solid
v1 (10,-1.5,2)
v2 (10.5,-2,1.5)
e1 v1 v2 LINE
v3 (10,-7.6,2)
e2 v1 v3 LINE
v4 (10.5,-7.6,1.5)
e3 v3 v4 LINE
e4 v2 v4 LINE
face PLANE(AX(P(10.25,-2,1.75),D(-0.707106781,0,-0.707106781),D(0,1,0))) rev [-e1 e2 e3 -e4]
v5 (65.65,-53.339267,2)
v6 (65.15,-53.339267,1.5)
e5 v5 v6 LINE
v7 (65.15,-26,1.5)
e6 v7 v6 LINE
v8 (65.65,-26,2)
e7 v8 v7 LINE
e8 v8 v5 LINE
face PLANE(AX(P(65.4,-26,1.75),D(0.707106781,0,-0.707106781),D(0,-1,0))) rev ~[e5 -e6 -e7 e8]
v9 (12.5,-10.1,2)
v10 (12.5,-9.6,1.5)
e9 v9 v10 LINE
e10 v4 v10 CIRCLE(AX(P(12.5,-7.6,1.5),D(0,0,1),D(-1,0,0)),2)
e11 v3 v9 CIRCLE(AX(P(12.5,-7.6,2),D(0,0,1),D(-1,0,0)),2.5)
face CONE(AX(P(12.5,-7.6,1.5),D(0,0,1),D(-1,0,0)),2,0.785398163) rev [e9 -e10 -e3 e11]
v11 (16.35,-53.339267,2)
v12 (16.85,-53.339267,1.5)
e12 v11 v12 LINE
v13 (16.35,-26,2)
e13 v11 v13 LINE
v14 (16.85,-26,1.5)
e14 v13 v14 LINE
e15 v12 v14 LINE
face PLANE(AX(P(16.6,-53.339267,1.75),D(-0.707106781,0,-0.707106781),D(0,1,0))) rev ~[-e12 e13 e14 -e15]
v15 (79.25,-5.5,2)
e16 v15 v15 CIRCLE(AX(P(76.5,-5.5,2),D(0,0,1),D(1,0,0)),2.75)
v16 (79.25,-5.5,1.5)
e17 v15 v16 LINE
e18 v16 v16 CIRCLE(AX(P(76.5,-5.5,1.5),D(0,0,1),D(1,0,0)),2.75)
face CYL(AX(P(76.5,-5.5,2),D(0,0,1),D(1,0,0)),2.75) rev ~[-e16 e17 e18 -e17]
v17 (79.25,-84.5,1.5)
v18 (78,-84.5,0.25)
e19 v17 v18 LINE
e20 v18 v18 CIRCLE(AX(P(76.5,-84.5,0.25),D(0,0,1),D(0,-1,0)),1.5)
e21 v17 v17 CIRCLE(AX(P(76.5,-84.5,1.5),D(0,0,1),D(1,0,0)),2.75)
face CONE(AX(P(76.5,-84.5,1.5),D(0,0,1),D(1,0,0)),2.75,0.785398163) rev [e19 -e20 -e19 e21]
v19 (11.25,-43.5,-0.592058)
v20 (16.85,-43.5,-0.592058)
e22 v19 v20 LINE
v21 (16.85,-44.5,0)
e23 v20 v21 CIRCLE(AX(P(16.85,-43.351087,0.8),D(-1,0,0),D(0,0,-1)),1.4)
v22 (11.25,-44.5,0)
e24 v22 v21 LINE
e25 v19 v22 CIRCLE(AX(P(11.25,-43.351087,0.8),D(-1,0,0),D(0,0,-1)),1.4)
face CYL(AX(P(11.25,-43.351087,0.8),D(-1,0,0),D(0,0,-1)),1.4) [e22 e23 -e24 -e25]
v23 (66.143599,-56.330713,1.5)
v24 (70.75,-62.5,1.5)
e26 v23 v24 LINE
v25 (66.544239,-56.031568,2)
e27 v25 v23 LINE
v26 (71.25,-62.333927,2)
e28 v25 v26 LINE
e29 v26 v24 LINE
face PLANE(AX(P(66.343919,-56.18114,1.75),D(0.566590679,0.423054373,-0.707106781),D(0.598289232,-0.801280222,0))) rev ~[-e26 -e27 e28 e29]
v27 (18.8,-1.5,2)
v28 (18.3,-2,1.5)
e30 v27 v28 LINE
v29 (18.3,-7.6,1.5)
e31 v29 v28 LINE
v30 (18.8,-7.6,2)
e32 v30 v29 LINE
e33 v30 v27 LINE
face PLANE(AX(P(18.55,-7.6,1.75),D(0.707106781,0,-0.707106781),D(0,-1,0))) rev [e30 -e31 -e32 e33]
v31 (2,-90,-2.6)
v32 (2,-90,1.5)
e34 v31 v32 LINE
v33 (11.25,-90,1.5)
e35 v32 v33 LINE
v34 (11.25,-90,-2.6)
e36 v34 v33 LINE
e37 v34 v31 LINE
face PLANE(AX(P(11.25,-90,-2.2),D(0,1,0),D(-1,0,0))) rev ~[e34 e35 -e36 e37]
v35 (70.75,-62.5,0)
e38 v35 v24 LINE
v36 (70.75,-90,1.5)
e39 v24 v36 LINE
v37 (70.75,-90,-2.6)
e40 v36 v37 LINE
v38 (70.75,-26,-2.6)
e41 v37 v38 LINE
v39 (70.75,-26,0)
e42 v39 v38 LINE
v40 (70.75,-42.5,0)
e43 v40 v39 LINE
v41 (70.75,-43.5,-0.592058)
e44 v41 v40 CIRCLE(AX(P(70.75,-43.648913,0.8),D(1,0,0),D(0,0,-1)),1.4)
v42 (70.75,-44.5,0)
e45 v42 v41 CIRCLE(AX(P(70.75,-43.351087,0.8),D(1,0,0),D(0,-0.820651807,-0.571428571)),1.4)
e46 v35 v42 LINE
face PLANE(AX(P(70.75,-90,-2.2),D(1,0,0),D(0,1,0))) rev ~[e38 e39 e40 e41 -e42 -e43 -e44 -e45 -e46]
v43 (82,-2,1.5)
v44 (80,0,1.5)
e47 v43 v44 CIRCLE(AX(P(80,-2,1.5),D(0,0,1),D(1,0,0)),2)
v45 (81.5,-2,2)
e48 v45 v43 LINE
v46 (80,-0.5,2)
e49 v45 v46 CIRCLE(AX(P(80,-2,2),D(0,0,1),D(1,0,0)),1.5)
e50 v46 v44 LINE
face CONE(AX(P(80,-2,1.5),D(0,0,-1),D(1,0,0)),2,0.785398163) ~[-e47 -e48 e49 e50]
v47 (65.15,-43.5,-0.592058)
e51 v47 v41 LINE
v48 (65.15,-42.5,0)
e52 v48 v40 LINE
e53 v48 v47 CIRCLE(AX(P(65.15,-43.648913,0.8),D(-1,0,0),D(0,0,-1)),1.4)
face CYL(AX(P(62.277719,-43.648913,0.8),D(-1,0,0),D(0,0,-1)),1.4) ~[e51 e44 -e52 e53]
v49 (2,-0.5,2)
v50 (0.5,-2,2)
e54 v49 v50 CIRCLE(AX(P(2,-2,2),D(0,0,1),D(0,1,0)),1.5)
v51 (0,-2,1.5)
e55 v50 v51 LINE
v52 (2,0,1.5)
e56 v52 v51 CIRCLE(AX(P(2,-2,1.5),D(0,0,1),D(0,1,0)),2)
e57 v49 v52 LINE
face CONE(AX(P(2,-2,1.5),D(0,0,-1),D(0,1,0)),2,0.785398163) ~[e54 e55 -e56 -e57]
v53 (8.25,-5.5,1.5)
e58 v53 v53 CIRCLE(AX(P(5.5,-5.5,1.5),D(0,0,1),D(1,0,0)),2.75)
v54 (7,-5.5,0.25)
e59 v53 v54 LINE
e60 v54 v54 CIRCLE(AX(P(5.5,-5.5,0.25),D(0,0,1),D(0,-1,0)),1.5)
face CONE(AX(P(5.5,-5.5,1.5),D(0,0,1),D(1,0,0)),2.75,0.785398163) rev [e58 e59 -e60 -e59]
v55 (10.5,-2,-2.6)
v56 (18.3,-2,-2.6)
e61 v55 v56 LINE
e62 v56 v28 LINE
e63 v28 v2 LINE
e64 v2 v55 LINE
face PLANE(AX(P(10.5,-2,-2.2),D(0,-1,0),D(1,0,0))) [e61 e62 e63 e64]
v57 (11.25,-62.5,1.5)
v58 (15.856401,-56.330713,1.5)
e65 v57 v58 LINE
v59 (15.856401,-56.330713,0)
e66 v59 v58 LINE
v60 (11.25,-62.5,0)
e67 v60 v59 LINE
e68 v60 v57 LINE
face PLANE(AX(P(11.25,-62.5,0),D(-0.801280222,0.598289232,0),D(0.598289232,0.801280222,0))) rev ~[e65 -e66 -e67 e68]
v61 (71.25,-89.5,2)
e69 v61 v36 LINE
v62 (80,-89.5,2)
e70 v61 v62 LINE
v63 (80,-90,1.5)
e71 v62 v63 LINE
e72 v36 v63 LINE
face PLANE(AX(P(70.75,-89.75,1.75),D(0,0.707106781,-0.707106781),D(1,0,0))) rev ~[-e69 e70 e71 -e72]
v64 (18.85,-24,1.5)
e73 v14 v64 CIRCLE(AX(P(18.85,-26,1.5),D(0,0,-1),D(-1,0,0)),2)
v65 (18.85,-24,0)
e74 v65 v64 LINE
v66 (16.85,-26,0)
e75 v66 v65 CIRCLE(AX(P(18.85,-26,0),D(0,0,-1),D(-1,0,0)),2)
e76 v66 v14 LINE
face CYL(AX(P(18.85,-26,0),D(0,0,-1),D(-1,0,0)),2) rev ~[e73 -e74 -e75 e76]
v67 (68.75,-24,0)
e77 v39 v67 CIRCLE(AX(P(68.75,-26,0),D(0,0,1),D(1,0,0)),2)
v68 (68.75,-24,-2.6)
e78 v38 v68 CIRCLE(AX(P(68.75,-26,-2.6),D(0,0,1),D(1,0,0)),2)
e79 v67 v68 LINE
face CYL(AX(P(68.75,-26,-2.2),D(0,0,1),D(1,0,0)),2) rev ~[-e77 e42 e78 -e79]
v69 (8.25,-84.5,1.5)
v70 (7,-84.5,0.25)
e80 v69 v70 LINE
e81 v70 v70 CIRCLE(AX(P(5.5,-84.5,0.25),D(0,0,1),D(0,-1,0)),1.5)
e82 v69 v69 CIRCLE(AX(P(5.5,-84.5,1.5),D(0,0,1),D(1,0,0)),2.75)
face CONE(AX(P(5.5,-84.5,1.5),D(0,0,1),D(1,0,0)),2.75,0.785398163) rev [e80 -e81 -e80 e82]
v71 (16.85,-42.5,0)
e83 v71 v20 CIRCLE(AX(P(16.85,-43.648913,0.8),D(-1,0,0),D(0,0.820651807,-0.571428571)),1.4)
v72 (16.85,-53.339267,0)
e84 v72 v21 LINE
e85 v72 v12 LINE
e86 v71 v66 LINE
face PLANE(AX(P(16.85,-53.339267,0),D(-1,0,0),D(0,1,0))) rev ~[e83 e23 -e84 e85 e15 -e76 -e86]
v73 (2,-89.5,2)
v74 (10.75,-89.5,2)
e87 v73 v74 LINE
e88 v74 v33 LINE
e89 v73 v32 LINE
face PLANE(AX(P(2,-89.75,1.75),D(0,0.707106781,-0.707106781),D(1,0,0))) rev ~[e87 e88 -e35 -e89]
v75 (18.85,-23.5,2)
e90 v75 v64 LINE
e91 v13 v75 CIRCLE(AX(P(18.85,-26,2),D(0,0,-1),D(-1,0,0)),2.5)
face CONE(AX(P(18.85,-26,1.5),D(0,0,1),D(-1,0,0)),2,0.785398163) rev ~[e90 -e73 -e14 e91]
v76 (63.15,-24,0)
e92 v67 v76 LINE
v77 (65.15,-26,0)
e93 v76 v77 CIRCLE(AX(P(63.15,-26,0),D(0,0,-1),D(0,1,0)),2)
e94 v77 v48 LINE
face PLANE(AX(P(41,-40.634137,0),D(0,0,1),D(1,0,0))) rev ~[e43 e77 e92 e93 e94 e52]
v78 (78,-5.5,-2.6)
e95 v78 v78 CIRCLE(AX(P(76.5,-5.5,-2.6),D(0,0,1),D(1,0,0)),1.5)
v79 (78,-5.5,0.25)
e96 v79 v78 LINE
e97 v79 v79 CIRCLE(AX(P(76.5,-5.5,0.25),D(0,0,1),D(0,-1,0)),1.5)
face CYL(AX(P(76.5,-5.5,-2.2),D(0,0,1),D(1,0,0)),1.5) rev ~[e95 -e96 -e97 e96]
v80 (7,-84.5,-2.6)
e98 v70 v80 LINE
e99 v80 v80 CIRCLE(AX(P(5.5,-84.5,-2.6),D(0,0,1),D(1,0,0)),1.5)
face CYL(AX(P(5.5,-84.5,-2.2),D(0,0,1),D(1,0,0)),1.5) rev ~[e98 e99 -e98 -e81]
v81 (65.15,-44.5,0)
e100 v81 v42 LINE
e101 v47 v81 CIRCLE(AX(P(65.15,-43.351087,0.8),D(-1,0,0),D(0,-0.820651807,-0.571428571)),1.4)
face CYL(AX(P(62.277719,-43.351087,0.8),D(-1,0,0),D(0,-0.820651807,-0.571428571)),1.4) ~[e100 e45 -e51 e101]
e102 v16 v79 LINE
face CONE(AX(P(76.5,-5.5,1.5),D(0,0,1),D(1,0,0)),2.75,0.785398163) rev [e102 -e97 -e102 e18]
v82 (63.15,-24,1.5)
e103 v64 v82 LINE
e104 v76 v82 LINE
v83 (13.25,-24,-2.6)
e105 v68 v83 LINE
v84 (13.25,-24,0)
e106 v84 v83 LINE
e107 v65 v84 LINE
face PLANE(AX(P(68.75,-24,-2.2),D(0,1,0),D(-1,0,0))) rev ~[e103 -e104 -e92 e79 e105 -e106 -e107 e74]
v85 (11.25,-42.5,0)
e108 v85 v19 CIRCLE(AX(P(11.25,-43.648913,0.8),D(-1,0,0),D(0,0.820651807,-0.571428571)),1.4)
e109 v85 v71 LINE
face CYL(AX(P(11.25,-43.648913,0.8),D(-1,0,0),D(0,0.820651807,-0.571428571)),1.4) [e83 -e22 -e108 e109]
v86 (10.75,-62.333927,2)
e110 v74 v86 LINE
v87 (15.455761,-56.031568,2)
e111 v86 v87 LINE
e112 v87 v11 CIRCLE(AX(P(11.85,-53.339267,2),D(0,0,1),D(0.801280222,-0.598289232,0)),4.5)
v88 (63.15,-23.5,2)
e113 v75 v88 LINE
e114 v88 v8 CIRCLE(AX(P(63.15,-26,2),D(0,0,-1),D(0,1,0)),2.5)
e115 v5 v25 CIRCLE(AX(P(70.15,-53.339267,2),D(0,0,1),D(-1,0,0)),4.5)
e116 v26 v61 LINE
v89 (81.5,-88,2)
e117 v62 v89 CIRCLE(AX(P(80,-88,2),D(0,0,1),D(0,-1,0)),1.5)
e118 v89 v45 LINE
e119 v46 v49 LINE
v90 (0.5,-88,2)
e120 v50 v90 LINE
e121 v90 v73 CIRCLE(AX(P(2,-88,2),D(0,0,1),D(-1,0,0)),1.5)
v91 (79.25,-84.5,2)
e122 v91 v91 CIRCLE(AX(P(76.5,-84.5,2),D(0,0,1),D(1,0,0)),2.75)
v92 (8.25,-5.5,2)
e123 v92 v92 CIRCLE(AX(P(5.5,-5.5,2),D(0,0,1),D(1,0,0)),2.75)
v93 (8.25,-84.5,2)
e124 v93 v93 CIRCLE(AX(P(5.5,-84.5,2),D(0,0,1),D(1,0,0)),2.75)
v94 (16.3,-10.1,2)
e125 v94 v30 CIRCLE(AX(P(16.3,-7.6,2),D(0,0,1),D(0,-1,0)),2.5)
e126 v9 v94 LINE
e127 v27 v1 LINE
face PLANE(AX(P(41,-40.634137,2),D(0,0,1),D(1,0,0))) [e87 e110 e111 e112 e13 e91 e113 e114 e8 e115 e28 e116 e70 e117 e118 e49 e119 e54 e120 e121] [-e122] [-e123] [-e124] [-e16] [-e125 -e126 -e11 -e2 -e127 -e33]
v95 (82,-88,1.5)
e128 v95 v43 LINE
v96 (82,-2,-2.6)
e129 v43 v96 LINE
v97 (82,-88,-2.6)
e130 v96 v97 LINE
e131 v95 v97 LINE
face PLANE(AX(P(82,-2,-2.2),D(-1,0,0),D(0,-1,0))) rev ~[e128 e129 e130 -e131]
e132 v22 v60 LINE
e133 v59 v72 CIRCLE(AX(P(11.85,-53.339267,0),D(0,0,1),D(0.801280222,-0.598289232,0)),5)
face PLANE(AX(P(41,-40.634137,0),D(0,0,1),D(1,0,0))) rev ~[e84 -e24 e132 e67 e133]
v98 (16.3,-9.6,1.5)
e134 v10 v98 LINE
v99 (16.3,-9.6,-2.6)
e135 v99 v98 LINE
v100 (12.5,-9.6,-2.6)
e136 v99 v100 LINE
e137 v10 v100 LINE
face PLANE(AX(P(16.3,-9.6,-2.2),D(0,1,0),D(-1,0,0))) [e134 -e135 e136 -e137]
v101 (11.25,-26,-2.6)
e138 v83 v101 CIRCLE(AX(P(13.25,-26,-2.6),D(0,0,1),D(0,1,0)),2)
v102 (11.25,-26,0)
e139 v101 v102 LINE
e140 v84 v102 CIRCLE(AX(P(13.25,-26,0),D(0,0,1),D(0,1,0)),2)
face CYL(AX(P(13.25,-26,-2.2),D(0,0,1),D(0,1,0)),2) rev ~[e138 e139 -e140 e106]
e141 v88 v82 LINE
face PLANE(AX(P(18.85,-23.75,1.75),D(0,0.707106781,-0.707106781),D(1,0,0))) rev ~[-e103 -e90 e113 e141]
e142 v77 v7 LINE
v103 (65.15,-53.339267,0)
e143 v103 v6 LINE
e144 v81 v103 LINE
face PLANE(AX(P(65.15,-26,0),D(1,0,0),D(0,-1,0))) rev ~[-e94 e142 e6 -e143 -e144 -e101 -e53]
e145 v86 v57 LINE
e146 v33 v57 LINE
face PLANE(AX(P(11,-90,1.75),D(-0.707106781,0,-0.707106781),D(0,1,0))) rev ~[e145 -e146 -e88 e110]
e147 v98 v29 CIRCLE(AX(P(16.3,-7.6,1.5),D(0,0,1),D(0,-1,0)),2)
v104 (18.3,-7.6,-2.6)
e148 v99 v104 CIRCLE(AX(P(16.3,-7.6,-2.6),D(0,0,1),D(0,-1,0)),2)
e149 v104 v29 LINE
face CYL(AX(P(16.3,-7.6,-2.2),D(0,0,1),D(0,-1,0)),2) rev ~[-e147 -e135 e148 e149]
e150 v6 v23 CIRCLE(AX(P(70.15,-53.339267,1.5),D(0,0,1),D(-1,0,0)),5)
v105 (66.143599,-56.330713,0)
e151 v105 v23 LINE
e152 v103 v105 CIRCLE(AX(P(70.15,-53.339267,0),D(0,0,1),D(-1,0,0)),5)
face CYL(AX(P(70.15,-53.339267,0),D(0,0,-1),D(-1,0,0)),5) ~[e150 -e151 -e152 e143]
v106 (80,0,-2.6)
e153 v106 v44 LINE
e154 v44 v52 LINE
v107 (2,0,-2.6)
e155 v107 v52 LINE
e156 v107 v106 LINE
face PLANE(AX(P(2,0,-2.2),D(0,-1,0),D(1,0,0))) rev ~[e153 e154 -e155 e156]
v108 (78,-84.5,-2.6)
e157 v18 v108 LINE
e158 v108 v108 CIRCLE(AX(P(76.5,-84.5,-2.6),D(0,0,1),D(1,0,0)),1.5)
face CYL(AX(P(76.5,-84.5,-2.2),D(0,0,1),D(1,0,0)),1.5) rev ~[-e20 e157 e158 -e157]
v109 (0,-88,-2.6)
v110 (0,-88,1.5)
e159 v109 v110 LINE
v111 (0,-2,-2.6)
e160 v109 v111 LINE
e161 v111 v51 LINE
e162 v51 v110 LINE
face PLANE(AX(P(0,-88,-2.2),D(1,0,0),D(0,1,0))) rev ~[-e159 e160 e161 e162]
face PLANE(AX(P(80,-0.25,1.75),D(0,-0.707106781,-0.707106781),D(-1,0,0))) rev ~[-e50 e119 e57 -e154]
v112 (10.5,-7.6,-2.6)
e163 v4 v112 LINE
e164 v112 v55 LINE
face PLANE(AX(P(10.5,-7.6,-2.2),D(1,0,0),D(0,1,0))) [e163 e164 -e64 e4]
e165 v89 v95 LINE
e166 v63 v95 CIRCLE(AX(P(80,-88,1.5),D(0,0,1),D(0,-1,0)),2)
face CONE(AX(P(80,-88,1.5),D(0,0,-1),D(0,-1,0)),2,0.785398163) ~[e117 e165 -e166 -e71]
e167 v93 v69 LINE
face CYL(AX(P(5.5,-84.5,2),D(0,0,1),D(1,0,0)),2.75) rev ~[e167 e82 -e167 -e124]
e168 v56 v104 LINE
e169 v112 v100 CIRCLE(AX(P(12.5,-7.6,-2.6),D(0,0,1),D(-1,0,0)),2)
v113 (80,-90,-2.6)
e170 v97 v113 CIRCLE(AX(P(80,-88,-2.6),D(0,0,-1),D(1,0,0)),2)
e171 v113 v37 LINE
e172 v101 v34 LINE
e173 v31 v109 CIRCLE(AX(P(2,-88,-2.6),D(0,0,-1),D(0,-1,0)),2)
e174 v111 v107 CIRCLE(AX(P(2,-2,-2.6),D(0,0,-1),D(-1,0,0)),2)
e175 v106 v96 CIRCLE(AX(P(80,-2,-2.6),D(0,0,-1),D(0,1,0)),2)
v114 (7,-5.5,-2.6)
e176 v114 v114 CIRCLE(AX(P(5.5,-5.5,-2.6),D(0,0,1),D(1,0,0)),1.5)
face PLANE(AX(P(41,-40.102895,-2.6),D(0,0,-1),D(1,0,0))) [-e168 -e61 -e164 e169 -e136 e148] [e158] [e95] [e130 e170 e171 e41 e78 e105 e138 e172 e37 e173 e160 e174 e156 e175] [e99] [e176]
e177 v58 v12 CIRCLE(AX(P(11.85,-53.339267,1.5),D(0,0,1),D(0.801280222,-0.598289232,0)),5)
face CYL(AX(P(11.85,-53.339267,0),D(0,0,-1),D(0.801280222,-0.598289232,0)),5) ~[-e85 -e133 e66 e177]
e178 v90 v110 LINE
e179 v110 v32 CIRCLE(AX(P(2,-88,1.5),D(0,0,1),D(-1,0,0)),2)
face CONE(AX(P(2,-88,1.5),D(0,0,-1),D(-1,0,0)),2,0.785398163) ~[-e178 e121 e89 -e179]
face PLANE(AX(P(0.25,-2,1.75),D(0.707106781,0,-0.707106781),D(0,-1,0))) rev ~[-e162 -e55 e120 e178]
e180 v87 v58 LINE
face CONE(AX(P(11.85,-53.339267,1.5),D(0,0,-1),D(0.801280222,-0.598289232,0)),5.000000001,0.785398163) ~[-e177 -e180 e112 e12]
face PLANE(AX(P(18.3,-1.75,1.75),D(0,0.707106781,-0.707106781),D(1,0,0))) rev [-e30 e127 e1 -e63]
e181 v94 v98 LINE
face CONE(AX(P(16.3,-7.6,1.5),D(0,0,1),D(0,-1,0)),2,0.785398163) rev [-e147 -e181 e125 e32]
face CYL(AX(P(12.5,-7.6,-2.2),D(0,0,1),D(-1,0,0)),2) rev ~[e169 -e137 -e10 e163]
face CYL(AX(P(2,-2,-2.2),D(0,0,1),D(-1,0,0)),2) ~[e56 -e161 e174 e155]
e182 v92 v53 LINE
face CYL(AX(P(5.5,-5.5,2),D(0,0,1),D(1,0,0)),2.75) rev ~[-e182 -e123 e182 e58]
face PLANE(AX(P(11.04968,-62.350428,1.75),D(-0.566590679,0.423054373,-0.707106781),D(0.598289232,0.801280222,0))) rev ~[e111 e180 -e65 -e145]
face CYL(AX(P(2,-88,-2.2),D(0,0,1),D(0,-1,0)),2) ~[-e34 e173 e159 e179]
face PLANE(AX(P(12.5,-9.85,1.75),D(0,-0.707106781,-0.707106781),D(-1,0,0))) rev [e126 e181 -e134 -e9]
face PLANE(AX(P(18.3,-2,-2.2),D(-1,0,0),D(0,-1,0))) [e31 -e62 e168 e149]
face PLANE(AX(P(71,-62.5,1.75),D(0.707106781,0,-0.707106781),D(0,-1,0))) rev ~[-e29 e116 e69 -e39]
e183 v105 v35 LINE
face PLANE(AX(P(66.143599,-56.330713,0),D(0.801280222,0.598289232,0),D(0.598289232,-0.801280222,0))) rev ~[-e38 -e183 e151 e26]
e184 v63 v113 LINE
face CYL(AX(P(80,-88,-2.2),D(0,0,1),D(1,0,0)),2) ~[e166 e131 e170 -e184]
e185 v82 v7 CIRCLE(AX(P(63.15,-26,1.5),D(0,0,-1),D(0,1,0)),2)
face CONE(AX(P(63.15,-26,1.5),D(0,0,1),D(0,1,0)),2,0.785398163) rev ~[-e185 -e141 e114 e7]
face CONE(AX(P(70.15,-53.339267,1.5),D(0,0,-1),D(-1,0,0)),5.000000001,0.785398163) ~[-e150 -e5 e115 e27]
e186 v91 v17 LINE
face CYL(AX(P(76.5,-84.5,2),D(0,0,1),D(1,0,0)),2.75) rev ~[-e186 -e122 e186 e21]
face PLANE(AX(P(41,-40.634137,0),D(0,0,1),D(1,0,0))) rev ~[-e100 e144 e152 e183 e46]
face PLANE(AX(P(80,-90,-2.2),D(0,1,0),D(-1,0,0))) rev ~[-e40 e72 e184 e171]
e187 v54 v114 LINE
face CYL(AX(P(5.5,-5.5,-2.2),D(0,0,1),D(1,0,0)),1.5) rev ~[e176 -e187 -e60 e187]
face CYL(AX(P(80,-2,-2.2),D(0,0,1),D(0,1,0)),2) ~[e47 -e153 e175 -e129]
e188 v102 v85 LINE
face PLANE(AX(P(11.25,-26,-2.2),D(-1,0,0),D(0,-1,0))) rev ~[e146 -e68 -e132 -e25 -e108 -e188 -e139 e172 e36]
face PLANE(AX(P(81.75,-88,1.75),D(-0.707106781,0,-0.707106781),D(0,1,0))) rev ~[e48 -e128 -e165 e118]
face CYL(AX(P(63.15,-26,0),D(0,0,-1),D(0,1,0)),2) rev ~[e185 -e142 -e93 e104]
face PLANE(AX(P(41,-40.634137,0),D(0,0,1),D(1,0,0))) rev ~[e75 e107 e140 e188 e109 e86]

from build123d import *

# Parameters (mm, degrees)
F1_DEPTH      = 2
F3_DEPTH      = 2.2
F5_DEPTH      = 25
F6_R          = 1.5
F7_DEPTH      = 4.2
F8_R          = 2.75
F9_DEPTH      = 2
F10_S5_R      = 1.5
F10_T6_DEPTH  = 5
F10_S11_R     = 1.5
F10_T12_DEPTH = 5
F10_S17_R     = 1.5
F10_T18_DEPTH = 5
F10_S23_R     = 1.5
F10_T24_DEPTH = 5
F11_W         = 5.6
F11_H         = 2
F12_DEPTH     = 0.6
F13_T1_DEPTH  = 8.4722813233
F13_T3_DEPTH  = 8.4722813233
F14_SIZE      = 0.5
F15_DEPTH     = 0.4


# Not quite as in the source:
# - a fillet or chamfer that OpenCascade refuses, or shapes differently, is made with other operations: its cross-section is extruded or revolved along the edge and cut away or added


with BuildPart() as f1:
    # F0 (on Top) → F1 (new body)
    with BuildSketch(Plane.XY):
        with BuildLine():
            Line((80, 0), (2, 0))
            ThreePointArc((2, 0), (0.5857864376, -0.5857864376), (0, -2))
            Line((0, -2), (0, -88))
            ThreePointArc((0, -88), (0.5857864376, -89.4142135624), (2, -90))
            Line((2, -90), (11.25, -90))
            Line((11.25, -90), (11.25, -62.5))
            Line((11.25, -62.5), (15.8564011104, -56.3307127986))
            ThreePointArc((15.8564011104, -56.3307127986), (16.5951030311, -54.9153368199), (16.85, -53.3392666362))
            Line((16.85, -53.3392666362), (16.85, -26))
            ThreePointArc((16.85, -26), (17.4357864376, -24.5857864376), (18.85, -24))
            Line((18.85, -24), (63.15, -24))
            ThreePointArc((63.15, -24), (64.5642135624, -24.5857864376), (65.15, -26))
            Line((65.15, -26), (65.15, -53.3392666362))
            ThreePointArc((65.15, -53.3392666362), (65.4048969689, -54.9153368199), (66.1435988896, -56.3307127986))
            Line((66.1435988896, -56.3307127986), (70.75, -62.5))
            Line((70.75, -62.5), (70.75, -90))
            Line((70.75, -90), (80, -90))
            ThreePointArc((80, -90), (81.4142135624, -89.4142135624), (82, -88))
            Line((82, -88), (82, -2))
            ThreePointArc((82, -2), (81.4142135624, -0.5857864376), (80, 0))
        make_face()
    extrude(amount=F1_DEPTH)

    # F2 (on face) → F3 (join)
    with BuildSketch(Plane(origin=(0, 0, 0), x_dir=(1, 0, 0), z_dir=(0, 0, -1))):
        with BuildLine():
            ThreePointArc((80, 0), (81.4142135624, 0.5857864376), (82, 2))
            Line((82, 2), (82, 88))
            ThreePointArc((82, 88), (81.4142135624, 89.4142135624), (80, 90))
            Line((80, 90), (70.75, 90))
            Line((70.75, 90), (70.75, 62.5))
            Line((70.75, 62.5), (70.75, 26))
            ThreePointArc((70.75, 26), (70.1642135624, 24.5857864376), (68.75, 24))
            Line((68.75, 24), (65.15, 24))
            Line((65.15, 24), (16.85, 24))
            Line((16.85, 24), (13.25, 24))
            ThreePointArc((13.25, 24), (11.8357864376, 24.5857864376), (11.25, 26))
            Line((11.25, 26), (11.25, 62.5))
            Line((11.25, 62.5), (11.25, 90))
            Line((11.25, 90), (2, 90))
            ThreePointArc((2, 90), (0.5857864376, 89.4142135624), (0, 88))
            Line((0, 88), (0, 2))
            ThreePointArc((0, 2), (0.5857864376, 0.5857864376), (2, 0))
            Line((2, 0), (80, 0))
        make_face()
    extrude(amount=F3_DEPTH)

    # F4 (on face) → F5 (cut)
    with BuildSketch(Plane.XY.offset(2)):
        with BuildLine():
            Line((18.3, -2), (10.5, -2))
            Line((10.5, -2), (10.5, -7.6))
            ThreePointArc((10.5, -7.6), (11.0857864376, -9.0142135624), (12.5, -9.6))
            Line((12.5, -9.6), (16.3, -9.6))
            ThreePointArc((16.3, -9.6), (17.7142135624, -9.0142135624), (18.3, -7.6))
            Line((18.3, -7.6), (18.3, -2))
        make_face()
    extrude(amount=-F5_DEPTH, mode=Mode.SUBTRACT)

    # F6 (on face) → F7 (cut)
    with BuildSketch(Plane.XY.offset(2)):
        with Locations((5.5, -84.5)):
            Circle(F6_R)
        with Locations((76.5, -84.5)):
            Circle(F6_R)
        with Locations((5.5, -5.5)):
            Circle(F6_R)
        with Locations((76.5, -5.5)):
            Circle(F6_R)
    extrude(amount=-F7_DEPTH, mode=Mode.SUBTRACT)

    # F8 (on face) → F9 (cut)
    with BuildSketch(Plane.XY.offset(2)):
        with Locations((5.5, -5.5)):
            Circle(F8_R)
        with Locations((76.5, -5.5)):
            Circle(F8_R)
        with Locations((76.5, -84.5)):
            Circle(F8_R)
        with Locations((5.5, -84.5)):
            Circle(F8_R)
    extrude(amount=-F9_DEPTH, mode=Mode.SUBTRACT)

    # F10: chamfer of 1.5 on 4 edges, made by hand


with BuildPart() as f10_tool2:
    # F10_s3 → F10_t4 (revolve)
    with BuildSketch(Plane.XZ.offset(84.5)):
        Polygon((8.25, 1.5), (6.75, 0), (8.25, 0), align=None)
    revolve(axis=Axis((5.5, -84.5, 0), (0, 0, 1)))

    # F10_s5 → F10_t6 (cut, symmetric)
    with BuildSketch(Plane.XY.offset(0.7)):
        with Locations((5.5, -84.5)):
            Circle(F10_S5_R)
    extrude(amount=F10_T6_DEPTH, both=True, mode=Mode.SUBTRACT)


with BuildPart() as f1_1:
    add(f1.part)

    # F10_t1: union F10_tool2
    add(f10_tool2.part)


with BuildPart() as f10_tool8:
    # F10_s9 → F10_t10 (revolve)
    with BuildSketch(Plane.XZ.offset(84.5)):
        Polygon((79.25, 1.5), (77.75, 0), (79.25, 0), align=None)
    revolve(axis=Axis((76.5, -84.5, 0), (0, 0, 1)))

    # F10_s11 → F10_t12 (cut, symmetric)
    with BuildSketch(Plane.XY.offset(0.7)):
        with Locations((76.5, -84.5)):
            Circle(F10_S11_R)
    extrude(amount=F10_T12_DEPTH, both=True, mode=Mode.SUBTRACT)


with BuildPart() as f1_2:
    add(f1_1.part)

    # F10_t7: union F10_tool8
    add(f10_tool8.part)


with BuildPart() as f10_tool14:
    # F10_s15 → F10_t16 (revolve)
    with BuildSketch(Plane.XZ.offset(5.5)):
        Polygon((8.25, 1.5), (6.75, 0), (8.25, 0), align=None)
    revolve(axis=Axis((5.5, -5.5, 0), (0, 0, 1)))

    # F10_s17 → F10_t18 (cut, symmetric)
    with BuildSketch(Plane.XY.offset(0.7)):
        with Locations((5.5, -5.5)):
            Circle(F10_S17_R)
    extrude(amount=F10_T18_DEPTH, both=True, mode=Mode.SUBTRACT)


with BuildPart() as f1_3:
    add(f1_2.part)

    # F10_t13: union F10_tool14
    add(f10_tool14.part)


with BuildPart() as f10_tool20:
    # F10_s21 → F10_t22 (revolve)
    with BuildSketch(Plane.XZ.offset(5.5)):
        Polygon((79.25, 1.5), (77.75, 0), (79.25, 0), align=None)
    revolve(axis=Axis((76.5, -5.5, 0), (0, 0, 1)))

    # F10_s23 → F10_t24 (cut, symmetric)
    with BuildSketch(Plane.XY.offset(0.7)):
        with Locations((76.5, -5.5)):
            Circle(F10_S23_R)
    extrude(amount=F10_T24_DEPTH, both=True, mode=Mode.SUBTRACT)


with BuildPart() as f1_4:
    add(f1_3.part)

    # F10_t19: union F10_tool20
    add(f10_tool20.part)

    # F11 (on face) → F12 (join)
    with BuildSketch(Plane(origin=(0, 0, 0), x_dir=(1, 0, 0), z_dir=(0, 0, -1))):
        with Locations((14.05, 43.5)):
            Rectangle(F11_W, F11_H)
        with Locations((67.95, 43.5)):
            Rectangle(F11_W, F11_H)
    extrude(amount=F12_DEPTH)

    # F13: fillet of radius 1.4 on 4 edges, made by hand

    # F13_s2 → F13_t1 (cut)
    with BuildSketch(Plane.YZ.offset(11.25)):
        with BuildLine():
            ThreePointArc((-42.5, 0), (-43.0008384595, -0.4409673646), (-43.6489125293, -0.6))
            Line((-43.6489125293, -0.6), (-42.5, -0.6))
            Line((-42.5, -0.6), (-42.5, 0))
        make_face()
        with BuildLine():
            ThreePointArc((-43.3510874707, -0.6), (-43.9991615405, -0.4409673646), (-44.5, 0))
            Line((-44.5, 0), (-44.5, -0.6))
            Line((-44.5, -0.6), (-43.3510874707, -0.6))
        make_face()
    extrude(amount=F13_T1_DEPTH, mode=Mode.SUBTRACT)

    # F13_s4 → F13_t3 (cut)
    with BuildSketch(Plane.YZ.offset(62.2777186767)):
        with BuildLine():
            ThreePointArc((-43.6489125293, -0.6), (-43.0008384595, -0.4409673646), (-42.5, 0))
            Line((-42.5, 0), (-42.5, -0.6))
            Line((-42.5, -0.6), (-43.6489125293, -0.6))
        make_face()
        with BuildLine():
            ThreePointArc((-44.5, 0), (-43.9991615405, -0.4409673646), (-43.3510874707, -0.6))
            Line((-43.3510874707, -0.6), (-44.5, -0.6))
            Line((-44.5, -0.6), (-44.5, 0))
        make_face()
    extrude(amount=F13_T3_DEPTH, mode=Mode.SUBTRACT)

    # F14
    f14_edges = [f1_4.edges().sort_by_distance(p)[0] for p in [
        (0.585786, -0.585786, 2),
        (41, 0, 2),
        (0, -45, 2),
        (10.5, -4.8, 2),
        (14.4, -2, 2),
        (18.3, -4.8, 2),
        (17.714214, -9.014214, 2),
        (14.4, -9.6, 2),
        (11.085786, -9.014214, 2),
        (81.414214, -0.585786, 2),
        (82, -45, 2),
        (11.25, -76.25, 2),
        (6.625, -90, 2),
        (0.585786, -89.414214, 2),
        (81.414214, -89.414214, 2),
        (75.375, -90, 2),
        (70.75, -76.25, 2),
        (68.446799, -59.415356, 2),
        (65.404897, -54.915337, 2),
        (65.15, -39.669633, 2),
        (64.564214, -24.585786, 2),
        (41, -24, 2),
        (17.435786, -24.585786, 2),
        (16.85, -39.669633, 2),
        (16.595103, -54.915337, 2),
        (13.553201, -59.415356, 2),
    ]]
    chamfer(f14_edges, length=F14_SIZE)

    # F15 (add): a face of the model
    f15_faces = [f1_4.faces().sort_by_distance(p)[0] for p in [
        (80.5532838324, -1.4467161676, -2.2),
    ]]
    extrude(f15_faces, amount=F15_DEPTH)


solid = f1_4.part
